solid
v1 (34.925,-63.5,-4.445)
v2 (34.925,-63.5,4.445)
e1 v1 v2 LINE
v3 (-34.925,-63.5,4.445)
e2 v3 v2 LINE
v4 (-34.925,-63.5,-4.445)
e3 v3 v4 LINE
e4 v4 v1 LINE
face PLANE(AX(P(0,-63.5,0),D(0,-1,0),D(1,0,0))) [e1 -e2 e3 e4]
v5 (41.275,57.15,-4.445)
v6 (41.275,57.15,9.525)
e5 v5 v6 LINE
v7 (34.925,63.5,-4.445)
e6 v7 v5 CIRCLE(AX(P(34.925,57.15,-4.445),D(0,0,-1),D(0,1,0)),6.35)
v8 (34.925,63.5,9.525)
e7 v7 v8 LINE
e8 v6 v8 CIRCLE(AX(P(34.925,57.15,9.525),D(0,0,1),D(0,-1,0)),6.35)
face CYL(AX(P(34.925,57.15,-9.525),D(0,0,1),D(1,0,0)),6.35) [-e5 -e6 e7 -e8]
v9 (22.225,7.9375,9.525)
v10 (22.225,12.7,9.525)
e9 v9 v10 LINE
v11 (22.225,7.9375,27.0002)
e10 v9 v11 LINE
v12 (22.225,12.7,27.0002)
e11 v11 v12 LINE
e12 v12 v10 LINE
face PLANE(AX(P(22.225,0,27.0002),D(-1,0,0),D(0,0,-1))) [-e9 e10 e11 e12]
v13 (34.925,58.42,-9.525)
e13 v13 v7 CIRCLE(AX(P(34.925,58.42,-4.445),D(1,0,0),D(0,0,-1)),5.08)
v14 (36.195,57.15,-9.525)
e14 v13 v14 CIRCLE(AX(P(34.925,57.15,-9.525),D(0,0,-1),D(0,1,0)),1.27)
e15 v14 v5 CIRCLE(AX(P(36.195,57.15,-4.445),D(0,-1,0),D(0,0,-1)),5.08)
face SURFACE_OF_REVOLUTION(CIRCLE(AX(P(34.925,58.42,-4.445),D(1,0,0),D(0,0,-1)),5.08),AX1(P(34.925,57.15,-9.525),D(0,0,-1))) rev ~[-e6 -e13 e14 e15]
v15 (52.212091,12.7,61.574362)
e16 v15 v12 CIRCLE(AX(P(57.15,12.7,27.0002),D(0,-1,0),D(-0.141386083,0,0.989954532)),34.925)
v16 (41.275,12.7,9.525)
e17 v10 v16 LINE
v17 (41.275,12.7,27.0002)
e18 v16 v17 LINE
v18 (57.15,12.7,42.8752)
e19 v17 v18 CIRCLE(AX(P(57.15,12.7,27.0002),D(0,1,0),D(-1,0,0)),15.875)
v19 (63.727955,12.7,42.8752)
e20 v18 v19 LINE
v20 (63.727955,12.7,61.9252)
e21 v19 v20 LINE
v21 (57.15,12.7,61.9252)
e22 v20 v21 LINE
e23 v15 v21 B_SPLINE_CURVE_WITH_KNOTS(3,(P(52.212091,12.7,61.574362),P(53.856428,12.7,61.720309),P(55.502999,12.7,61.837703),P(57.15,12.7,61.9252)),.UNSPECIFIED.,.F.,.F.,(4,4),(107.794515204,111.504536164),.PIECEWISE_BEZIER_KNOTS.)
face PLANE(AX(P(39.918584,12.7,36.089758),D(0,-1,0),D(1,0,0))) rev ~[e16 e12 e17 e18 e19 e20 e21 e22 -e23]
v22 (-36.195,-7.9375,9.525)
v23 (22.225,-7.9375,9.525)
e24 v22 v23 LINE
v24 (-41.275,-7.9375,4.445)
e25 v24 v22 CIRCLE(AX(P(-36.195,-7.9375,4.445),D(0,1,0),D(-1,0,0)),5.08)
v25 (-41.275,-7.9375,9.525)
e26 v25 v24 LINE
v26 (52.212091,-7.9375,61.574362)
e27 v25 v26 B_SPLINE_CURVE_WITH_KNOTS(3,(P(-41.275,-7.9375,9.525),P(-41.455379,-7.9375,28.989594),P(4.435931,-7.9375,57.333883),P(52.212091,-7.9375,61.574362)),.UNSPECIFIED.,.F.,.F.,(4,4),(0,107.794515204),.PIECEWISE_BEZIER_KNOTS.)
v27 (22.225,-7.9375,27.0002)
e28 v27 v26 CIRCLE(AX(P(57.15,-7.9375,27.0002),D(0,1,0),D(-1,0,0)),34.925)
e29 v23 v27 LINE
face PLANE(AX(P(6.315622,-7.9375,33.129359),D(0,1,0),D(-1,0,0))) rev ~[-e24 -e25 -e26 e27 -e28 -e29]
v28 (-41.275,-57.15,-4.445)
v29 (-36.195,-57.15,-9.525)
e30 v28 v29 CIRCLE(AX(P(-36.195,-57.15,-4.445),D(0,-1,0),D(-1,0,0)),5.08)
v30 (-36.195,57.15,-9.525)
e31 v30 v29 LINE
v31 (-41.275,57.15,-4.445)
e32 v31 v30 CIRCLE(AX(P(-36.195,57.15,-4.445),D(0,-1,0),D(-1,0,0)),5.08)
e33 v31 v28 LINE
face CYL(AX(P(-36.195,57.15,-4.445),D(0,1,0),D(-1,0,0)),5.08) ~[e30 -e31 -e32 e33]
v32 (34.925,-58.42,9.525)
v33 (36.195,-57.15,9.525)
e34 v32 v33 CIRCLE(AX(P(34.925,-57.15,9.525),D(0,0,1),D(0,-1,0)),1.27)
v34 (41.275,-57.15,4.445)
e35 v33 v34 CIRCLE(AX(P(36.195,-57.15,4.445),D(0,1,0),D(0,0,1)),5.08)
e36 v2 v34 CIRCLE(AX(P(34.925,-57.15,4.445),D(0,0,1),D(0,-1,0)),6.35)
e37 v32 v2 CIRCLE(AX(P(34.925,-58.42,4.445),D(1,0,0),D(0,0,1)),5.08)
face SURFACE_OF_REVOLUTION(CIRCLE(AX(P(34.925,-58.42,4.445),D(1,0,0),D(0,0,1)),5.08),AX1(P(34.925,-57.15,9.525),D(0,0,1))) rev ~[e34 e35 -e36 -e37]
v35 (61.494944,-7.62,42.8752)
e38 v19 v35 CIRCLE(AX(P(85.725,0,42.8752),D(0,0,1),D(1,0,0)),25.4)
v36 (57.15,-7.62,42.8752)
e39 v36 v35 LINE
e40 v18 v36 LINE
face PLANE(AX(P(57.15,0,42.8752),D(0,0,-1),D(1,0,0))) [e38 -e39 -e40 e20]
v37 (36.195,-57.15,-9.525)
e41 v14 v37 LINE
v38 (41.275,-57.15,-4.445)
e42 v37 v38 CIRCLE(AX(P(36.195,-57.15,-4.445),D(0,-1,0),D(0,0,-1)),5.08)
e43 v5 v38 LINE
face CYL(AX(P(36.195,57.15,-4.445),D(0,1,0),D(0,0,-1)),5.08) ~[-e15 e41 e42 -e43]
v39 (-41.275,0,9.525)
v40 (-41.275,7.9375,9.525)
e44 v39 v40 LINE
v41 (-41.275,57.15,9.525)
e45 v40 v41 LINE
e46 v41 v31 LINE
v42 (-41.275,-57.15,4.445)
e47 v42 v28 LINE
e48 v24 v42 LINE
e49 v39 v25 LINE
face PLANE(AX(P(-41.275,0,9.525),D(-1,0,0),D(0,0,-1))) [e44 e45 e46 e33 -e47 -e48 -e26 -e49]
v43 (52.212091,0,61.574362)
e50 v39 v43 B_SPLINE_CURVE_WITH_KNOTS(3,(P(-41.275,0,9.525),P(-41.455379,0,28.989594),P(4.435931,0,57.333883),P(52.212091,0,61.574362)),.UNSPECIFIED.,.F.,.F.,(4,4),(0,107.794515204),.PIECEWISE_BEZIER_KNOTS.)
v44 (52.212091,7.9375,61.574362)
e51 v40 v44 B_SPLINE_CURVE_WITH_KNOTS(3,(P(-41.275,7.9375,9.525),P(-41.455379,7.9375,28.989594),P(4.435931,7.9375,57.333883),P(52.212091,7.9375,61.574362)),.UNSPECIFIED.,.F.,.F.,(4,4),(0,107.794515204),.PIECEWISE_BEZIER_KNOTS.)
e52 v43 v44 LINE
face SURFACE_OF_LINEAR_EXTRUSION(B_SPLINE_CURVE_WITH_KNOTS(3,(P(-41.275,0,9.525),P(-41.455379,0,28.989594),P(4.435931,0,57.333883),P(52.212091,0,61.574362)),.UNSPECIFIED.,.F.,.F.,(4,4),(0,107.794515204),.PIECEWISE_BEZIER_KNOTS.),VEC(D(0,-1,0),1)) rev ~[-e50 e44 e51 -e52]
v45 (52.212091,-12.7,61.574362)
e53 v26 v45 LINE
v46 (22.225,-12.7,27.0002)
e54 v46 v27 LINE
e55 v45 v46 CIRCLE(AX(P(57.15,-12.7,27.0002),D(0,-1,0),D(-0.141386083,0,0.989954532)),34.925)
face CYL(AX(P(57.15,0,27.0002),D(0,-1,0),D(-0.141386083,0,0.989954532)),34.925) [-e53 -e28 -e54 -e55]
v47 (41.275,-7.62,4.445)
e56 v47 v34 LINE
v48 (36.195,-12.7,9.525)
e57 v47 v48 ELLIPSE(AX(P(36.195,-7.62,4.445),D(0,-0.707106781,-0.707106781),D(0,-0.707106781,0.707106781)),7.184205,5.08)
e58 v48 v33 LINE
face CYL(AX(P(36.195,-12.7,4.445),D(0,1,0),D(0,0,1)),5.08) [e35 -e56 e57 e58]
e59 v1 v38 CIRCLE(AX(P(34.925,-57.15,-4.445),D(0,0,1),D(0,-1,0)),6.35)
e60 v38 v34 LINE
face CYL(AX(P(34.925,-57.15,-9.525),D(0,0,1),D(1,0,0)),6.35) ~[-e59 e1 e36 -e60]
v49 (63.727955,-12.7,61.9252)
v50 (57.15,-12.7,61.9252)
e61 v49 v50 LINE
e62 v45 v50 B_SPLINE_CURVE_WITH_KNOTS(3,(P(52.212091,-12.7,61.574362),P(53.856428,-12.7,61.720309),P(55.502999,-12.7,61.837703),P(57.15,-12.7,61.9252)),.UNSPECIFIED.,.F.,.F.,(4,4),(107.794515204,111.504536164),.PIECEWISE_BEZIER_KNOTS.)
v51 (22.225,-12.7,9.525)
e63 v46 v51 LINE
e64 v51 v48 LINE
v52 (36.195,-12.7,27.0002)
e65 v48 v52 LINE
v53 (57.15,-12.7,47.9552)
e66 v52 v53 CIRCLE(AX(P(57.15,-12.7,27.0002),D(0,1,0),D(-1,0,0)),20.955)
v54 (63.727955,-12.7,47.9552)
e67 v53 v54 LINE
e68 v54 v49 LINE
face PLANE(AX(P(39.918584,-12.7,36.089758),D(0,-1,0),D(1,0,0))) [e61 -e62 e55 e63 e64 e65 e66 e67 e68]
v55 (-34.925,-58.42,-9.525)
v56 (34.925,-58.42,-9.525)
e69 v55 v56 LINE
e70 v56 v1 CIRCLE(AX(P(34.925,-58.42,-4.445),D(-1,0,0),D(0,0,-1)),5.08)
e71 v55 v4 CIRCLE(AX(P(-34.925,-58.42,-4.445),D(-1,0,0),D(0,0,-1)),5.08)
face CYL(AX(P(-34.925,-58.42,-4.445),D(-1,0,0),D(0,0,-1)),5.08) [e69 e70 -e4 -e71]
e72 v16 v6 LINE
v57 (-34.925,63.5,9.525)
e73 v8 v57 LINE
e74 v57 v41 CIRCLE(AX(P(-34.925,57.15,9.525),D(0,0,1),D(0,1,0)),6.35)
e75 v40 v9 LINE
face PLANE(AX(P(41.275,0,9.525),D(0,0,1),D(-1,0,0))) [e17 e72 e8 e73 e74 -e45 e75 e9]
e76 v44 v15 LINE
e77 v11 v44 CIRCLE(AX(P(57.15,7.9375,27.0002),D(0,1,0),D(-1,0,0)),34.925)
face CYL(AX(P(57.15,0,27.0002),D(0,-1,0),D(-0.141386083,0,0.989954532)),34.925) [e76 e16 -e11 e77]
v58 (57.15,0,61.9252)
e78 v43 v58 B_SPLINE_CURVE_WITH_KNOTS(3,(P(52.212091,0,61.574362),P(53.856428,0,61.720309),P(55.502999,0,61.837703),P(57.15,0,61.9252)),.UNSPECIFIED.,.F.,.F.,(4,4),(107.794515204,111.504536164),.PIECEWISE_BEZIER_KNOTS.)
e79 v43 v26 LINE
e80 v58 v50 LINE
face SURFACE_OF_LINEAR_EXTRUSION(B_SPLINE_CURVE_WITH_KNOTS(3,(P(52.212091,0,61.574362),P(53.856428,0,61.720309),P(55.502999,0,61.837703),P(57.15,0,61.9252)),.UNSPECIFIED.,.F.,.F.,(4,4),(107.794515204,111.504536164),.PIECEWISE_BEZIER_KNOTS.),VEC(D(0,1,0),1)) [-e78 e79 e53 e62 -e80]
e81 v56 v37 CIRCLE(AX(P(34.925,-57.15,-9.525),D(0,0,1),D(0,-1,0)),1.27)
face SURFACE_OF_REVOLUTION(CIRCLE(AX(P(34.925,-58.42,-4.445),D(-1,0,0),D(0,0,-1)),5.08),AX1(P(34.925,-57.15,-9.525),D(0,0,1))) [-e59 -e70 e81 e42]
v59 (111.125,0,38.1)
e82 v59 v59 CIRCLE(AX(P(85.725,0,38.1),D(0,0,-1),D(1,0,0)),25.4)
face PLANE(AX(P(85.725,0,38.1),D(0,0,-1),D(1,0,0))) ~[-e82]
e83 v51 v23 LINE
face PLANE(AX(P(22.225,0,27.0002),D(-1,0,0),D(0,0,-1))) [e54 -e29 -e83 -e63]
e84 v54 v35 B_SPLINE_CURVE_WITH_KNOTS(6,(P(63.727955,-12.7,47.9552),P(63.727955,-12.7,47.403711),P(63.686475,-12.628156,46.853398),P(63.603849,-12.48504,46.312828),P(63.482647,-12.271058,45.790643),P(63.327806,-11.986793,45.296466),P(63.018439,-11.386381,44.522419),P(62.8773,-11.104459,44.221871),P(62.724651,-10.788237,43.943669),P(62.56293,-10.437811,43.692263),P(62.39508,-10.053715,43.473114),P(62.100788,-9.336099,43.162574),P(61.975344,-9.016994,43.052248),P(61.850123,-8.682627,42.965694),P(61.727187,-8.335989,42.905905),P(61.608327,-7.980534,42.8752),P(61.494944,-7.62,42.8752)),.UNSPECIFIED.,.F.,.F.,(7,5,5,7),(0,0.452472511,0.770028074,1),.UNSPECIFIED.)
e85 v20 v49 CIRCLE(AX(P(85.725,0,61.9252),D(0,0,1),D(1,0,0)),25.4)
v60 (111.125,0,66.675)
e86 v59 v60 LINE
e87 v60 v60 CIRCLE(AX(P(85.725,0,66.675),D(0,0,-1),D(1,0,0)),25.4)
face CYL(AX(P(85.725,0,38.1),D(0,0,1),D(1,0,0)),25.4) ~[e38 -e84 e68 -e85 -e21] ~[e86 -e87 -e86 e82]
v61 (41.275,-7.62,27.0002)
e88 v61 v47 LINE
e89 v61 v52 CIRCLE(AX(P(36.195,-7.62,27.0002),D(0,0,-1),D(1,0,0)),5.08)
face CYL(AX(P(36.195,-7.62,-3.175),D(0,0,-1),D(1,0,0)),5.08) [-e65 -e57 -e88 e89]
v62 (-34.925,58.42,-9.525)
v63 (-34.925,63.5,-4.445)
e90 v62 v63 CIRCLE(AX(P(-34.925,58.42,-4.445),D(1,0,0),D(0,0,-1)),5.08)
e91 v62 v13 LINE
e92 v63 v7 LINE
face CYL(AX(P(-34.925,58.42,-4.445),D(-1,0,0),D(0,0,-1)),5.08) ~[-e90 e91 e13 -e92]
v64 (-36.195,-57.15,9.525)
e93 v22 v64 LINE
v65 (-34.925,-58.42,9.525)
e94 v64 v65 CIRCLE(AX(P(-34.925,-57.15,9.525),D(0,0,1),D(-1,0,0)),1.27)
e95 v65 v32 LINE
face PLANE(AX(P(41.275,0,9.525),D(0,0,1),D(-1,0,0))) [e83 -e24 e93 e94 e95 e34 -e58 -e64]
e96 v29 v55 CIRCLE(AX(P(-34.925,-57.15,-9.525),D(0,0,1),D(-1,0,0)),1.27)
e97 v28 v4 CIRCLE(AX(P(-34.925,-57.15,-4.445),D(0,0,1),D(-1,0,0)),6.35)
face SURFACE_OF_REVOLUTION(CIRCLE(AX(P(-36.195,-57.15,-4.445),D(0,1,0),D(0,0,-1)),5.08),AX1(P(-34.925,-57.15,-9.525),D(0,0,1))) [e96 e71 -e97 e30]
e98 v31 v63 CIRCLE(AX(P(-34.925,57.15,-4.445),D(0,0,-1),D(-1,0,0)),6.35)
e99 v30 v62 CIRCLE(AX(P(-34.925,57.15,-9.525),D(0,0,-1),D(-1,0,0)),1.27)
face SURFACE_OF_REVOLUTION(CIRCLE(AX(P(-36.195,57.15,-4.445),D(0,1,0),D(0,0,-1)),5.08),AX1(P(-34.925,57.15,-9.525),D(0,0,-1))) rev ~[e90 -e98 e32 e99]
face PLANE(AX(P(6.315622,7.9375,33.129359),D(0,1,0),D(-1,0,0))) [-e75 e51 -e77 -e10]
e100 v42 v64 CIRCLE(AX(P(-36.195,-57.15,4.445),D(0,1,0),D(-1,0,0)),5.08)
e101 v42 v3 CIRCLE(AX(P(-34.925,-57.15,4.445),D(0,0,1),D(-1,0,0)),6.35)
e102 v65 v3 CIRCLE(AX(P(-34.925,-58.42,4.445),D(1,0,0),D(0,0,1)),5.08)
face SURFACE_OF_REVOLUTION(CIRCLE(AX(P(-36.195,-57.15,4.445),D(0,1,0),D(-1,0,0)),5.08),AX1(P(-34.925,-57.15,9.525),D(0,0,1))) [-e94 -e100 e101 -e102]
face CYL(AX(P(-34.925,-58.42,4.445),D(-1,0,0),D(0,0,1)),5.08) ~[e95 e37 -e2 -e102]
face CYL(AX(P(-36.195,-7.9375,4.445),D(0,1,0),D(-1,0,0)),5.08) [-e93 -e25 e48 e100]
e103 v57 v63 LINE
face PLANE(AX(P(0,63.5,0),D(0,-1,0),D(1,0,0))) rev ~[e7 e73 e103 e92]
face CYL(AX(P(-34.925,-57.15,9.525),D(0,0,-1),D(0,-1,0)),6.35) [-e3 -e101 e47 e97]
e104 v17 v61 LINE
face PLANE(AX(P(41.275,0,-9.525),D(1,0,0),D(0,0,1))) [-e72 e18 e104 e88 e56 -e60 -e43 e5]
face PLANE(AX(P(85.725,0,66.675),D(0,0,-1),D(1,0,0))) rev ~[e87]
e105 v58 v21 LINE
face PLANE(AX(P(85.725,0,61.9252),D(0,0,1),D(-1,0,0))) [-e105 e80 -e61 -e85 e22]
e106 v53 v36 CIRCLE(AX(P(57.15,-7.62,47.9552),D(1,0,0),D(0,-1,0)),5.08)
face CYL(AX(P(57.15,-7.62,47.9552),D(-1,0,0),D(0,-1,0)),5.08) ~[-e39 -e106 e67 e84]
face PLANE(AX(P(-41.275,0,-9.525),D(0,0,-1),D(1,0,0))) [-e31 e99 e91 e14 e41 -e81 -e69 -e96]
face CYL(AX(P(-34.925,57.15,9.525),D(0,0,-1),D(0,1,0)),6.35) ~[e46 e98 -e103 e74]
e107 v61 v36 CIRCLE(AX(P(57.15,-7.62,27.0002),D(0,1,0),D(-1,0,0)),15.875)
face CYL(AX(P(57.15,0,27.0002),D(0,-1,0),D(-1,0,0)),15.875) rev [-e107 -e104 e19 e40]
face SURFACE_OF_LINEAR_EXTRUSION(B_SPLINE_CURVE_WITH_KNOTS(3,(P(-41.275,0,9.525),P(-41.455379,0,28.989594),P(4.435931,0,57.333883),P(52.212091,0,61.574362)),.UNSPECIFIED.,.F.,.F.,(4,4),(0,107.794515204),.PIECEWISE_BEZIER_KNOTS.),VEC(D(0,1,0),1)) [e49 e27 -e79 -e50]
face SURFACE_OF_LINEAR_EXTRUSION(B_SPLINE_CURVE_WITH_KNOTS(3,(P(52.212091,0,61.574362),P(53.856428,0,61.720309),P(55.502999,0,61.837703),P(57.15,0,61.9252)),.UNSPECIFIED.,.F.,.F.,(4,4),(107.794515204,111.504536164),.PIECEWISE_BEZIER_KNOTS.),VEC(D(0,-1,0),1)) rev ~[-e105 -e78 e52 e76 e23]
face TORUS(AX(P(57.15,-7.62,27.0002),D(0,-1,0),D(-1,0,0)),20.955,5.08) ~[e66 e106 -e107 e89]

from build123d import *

# Parameters (mm, degrees)
F1_DEPTH     = 63.5
F0_W         = 25.4
F0_H         = 19.05
F2_DEPTH     = 12.7
F3_DEPTH     = 7.9375
F5_R         = 6.35
F6_T1_DEPTH  = 114.3
F6_T3_DEPTH  = 17.4752
F6_T5_DEPTH  = 49.2125
F6_T7_DEPTH  = 69.85
F6_T9_DEPTH  = 44.45
F6_T12_ANGLE = 90
F6_T14_ANGLE = 90
F6_T16_ANGLE = 90
F6_T18_ANGLE = 90
F6_T20_ANGLE = 90
F6_T22_ANGLE = 90
F6_T26_DEPTH = 19.2779547439
F6_S27_R     = 25.4
F6_T28_DEPTH = 12
F6_T30_ANGLE = 90
F6_T35_DEPTH = 57.15
F6_T39_DEPTH = 30.1752


# Not quite as in the source:
# - a fillet or chamfer that OpenCascade refuses, or shapes differently, is made with other operations: its cross-section is extruded or revolved along the edge and cut away or added


with BuildPart() as f1:
    # F0 (on Front) → F1 (new body, symmetric)
    with BuildSketch(Plane.XZ):
        Polygon((-41.275, 9.525), (-41.275, -9.525), (41.275, -9.525), (41.275, 9.525), (22.225, 9.525), align=None)
    extrude(amount=F1_DEPTH, both=True)

    # F0 (on Front) → F2 (join, symmetric)
    with BuildSketch(Plane.XZ):
        with BuildLine():
            Line((22.225, 9.525), (41.275, 9.525))
            Line((41.275, 9.525), (41.275, 27.0002))
            ThreePointArc((41.275, 27.0002), (45.9246798487, 38.2255201513), (57.15, 42.8752))
            Line((57.15, 42.8752), (60.325, 42.8752))
            Line((60.325, 42.8752), (60.325, 61.9252))
            Line((60.325, 61.9252), (57.15, 61.9252))
            add(Edge.make_bspline(
                [(52.2120910402, 61.5743620304), (53.8564284602, 61.7203088284), (55.5029986104, 61.8377030625), (57.15, 61.9252)],
                knots=[107.7945152041, 107.7945152041, 107.7945152041, 107.7945152041, 111.5045361635, 111.5045361635, 111.5045361635, 111.5045361635], degree=3))
            ThreePointArc((52.2120910402, 61.5743620304), (30.766178296, 49.8835908608), (22.225, 27.0002))
            Line((22.225, 27.0002), (22.225, 9.525))
        make_face()
        with Locations((73.025, 52.4002)):
            Rectangle(F0_W, F0_H)
    extrude(amount=F2_DEPTH, both=True)

    # F0 (on Front) → F3 (join, symmetric)
    with BuildSketch(Plane.XZ):
        with BuildLine():
            add(Edge.make_bspline(
                [(-41.275, 9.525), (-41.4553787608, 28.9895938663), (4.4359310246, 57.3338834698), (52.2120910402, 61.5743620304)],
                knots=[0, 0, 0, 0, 107.7945152041, 107.7945152041, 107.7945152041, 107.7945152041], degree=3))
            Line((-41.275, 9.525), (22.225, 9.525))
            Line((22.225, 9.525), (22.225, 27.0002))
            ThreePointArc((22.225, 27.0002), (30.766178296, 49.8835908608), (52.2120910402, 61.5743620304))
        make_face()
    extrude(amount=F3_DEPTH, both=True)

    # F0 (on Front) → F4 (revolve)
    with BuildSketch(Plane.XZ):
        Polygon((85.725, 66.675), (85.725, 61.9252), (85.725, 42.8752), (85.725, 38.1), (111.125, 38.1), (111.125, 66.675), align=None)
    revolve(axis=Axis((85.725, 0, 52.3875), (0, 0, -1)))

    # F5
    f5_edges = [f1.edges().sort_by_distance(p)[0] for p in [
        (41.275, -63.5, 0),
        (-41.275, -63.5, 0),
        (41.275, 63.5, 0),
        (-41.275, 63.5, 0),
    ]]
    fillet(f5_edges, radius=F5_R)

    # F6: fillet of radius 5.08 on 16 edges, made by hand

    # F6_s2 → F6_t1 (cut)
    with BuildSketch(Plane.XZ.offset(-57.15)):
        with BuildLine():
            ThreePointArc((36.195, -9.525), (39.7871024484, -8.0371024484), (41.275, -4.445))
            Line((41.275, -4.445), (41.275, -9.525))
            Line((41.275, -9.525), (36.195, -9.525))
        make_face()
        with BuildLine():
            ThreePointArc((-41.275, -4.445), (-39.7871024484, -8.0371024484), (-36.195, -9.525))
            Line((-36.195, -9.525), (-41.275, -9.525))
            Line((-41.275, -9.525), (-41.275, -4.445))
        make_face()
    extrude(amount=F6_T1_DEPTH, mode=Mode.SUBTRACT)

    # F6_s4 → F6_t3 (cut)
    with BuildSketch(Plane.XY.offset(9.525)):
        with BuildLine():
            ThreePointArc((41.275, -7.62), (39.7871024484, -11.2121024484), (36.195, -12.7))
            Line((36.195, -12.7), (41.275, -12.7))
            Line((41.275, -12.7), (41.275, -7.62))
        make_face()
    extrude(amount=F6_T3_DEPTH, mode=Mode.SUBTRACT)

    # F6_s6 → F6_t5 (cut)
    with BuildSketch(Plane.XZ.offset(7.9375)):
        with BuildLine():
            ThreePointArc((-41.275, 4.445), (-39.7871024484, 8.0371024484), (-36.195, 9.525))
            Line((-36.195, 9.525), (-41.275, 9.525))
            Line((-41.275, 9.525), (-41.275, 4.445))
        make_face()
    extrude(amount=F6_T5_DEPTH, mode=Mode.SUBTRACT)

    # F6_s8 → F6_t7 (cut)
    with BuildSketch(Plane.YZ.offset(-34.925)):
        with BuildLine():
            ThreePointArc((58.42, -9.525), (62.0121024484, -8.0371024484), (63.5, -4.445))
            Line((63.5, -4.445), (63.5, -9.525))
            Line((63.5, -9.525), (58.42, -9.525))
        make_face()
        with BuildLine():
            ThreePointArc((-58.42, -9.525), (-62.0121024484, -8.0371024484), (-63.5, -4.445))
            Line((-63.5, -4.445), (-63.5, -9.525))
            Line((-63.5, -9.525), (-58.42, -9.525))
        make_face()
        with BuildLine():
            ThreePointArc((-58.42, 9.525), (-62.0121024484, 8.0371024484), (-63.5, 4.445))
            Line((-63.5, 4.445), (-63.5, 9.525))
            Line((-63.5, 9.525), (-58.42, 9.525))
        make_face()
    extrude(amount=F6_T7_DEPTH, mode=Mode.SUBTRACT)

    # F6_s10 → F6_t9 (cut)
    with BuildSketch(Plane.XZ.offset(12.7)):
        with BuildLine():
            ThreePointArc((36.195, 9.525), (39.7871024484, 8.0371024484), (41.275, 4.445))
            Line((41.275, 4.445), (41.275, 9.525))
            Line((41.275, 9.525), (36.195, 9.525))
        make_face()
    extrude(amount=F6_T9_DEPTH, mode=Mode.SUBTRACT)

    # F6_s11 → F6_t12 (revolve, cut)
    with BuildSketch(Plane.YZ.offset(34.925)):
        with BuildLine():
            ThreePointArc((-58.42, 9.525), (-62.0121024484, 8.0371024484), (-63.5, 4.445))
            Line((-63.5, 4.445), (-63.5, 9.525))
            Line((-63.5, 9.525), (-58.42, 9.525))
        make_face()
    revolve(axis=Axis((34.925, -57.15, 9.525), (0, 0, 1)), revolution_arc=F6_T12_ANGLE, mode=Mode.SUBTRACT)

    # F6_s13 → F6_t14 (revolve, cut)
    with BuildSketch(Plane.XZ.offset(-57.15)):
        with BuildLine():
            ThreePointArc((-36.195, -9.525), (-39.7871024484, -8.0371024484), (-41.275, -4.445))
            Line((-41.275, -4.445), (-41.275, -9.525))
            Line((-41.275, -9.525), (-36.195, -9.525))
        make_face()
    revolve(axis=Axis((-34.925, 57.15, -9.525), (0, 0, -1)), revolution_arc=F6_T14_ANGLE, mode=Mode.SUBTRACT)

    # F6_s15 → F6_t16 (revolve, cut)
    with BuildSketch(Plane.XZ.offset(57.15)):
        with BuildLine():
            ThreePointArc((-36.195, -9.525), (-39.7871024484, -8.0371024484), (-41.275, -4.445))
            Line((-41.275, -4.445), (-41.275, -9.525))
            Line((-41.275, -9.525), (-36.195, -9.525))
        make_face()
    revolve(axis=Axis((-34.925, -57.15, -9.525), (0, 0, 1)), revolution_arc=F6_T16_ANGLE, mode=Mode.SUBTRACT)

    # F6_s17 → F6_t18 (revolve, cut)
    with BuildSketch(Plane.YZ.offset(34.925)):
        with BuildLine():
            ThreePointArc((58.42, -9.525), (62.0121024484, -8.0371024484), (63.5, -4.445))
            Line((63.5, -4.445), (63.5, -9.525))
            Line((63.5, -9.525), (58.42, -9.525))
        make_face()
    revolve(axis=Axis((34.925, 57.15, -9.525), (0, 0, -1)), revolution_arc=F6_T18_ANGLE, mode=Mode.SUBTRACT)

    # F6_s19 → F6_t20 (revolve, cut)
    with BuildSketch(Plane.YZ.offset(34.925)):
        with BuildLine():
            ThreePointArc((-58.42, -9.525), (-62.0121024484, -8.0371024484), (-63.5, -4.445))
            Line((-63.5, -4.445), (-63.5, -9.525))
            Line((-63.5, -9.525), (-58.42, -9.525))
        make_face()
    revolve(axis=Axis((34.925, -57.15, -9.525), (0, 0, 1)), revolution_arc=F6_T20_ANGLE, mode=Mode.SUBTRACT)

    # F6_s21 → F6_t22 (revolve, cut)
    with BuildSketch(Plane.XZ.offset(57.15)):
        with BuildLine():
            ThreePointArc((-41.275, 4.445), (-39.7871024484, 8.0371024484), (-36.195, 9.525))
            Line((-36.195, 9.525), (-41.275, 9.525))
            Line((-41.275, 9.525), (-41.275, 4.445))
        make_face()
    revolve(axis=Axis((-34.925, -57.15, 9.525), (0, 0, 1)), revolution_arc=F6_T22_ANGLE, mode=Mode.SUBTRACT)


with BuildPart() as f6_tool24:
    # F6_s25 → F6_t26 (new body)
    with BuildSketch(Plane.YZ.offset(57.15)):
        with BuildLine():
            ThreePointArc((-12.7, 47.9552), (-11.2121024484, 44.3630975516), (-7.62, 42.8752))
            Line((-7.62, 42.8752), (-12.7, 42.8752))
            Line((-12.7, 42.8752), (-12.7, 47.9552))
        make_face()
    extrude(amount=F6_T26_DEPTH)

    # F6_s27 → F6_t28 (cut, symmetric)
    with BuildSketch(Plane.XY.offset(45.4)):
        with Locations((85.725, 0)):
            Circle(F6_S27_R)
    extrude(amount=F6_T28_DEPTH, both=True, mode=Mode.SUBTRACT)


with BuildPart() as f1_1:
    add(f1.part)

    # F6_t23: cut F6_tool24
    add(f6_tool24.part, mode=Mode.SUBTRACT)

    # F6_s29 → F6_t30 (revolve, cut)
    with BuildSketch(Plane.XY.offset(27.0002)):
        with BuildLine():
            ThreePointArc((36.195, -12.7), (39.7871024484, -11.2121024484), (41.275, -7.62))
            Line((41.275, -7.62), (41.275, -12.7))
            Line((41.275, -12.7), (36.195, -12.7))
        make_face()
    revolve(axis=Axis((57.15, -12.7, 27.0002), (0, 1, 0)), revolution_arc=F6_T30_ANGLE, mode=Mode.SUBTRACT)


with BuildPart() as f6_tool33:
    # F6_s34 → F6_t35 (new body)
    with BuildSketch(Plane.XZ.offset(57.15)):
        with BuildLine():
            ThreePointArc((36.195, 9.525), (39.7871024484, 8.0371024484), (41.275, 4.445))
            Line((41.275, 4.445), (41.275, 9.525))
            Line((41.275, 9.525), (36.195, 9.525))
        make_face()
    extrude(amount=-F6_T35_DEPTH)

    split(bisect_by=Plane.XZ.offset(12.7), keep=Keep.BOTTOM)


with BuildPart() as f6_tool37:
    # F6_s38 → F6_t39 (new body)
    with BuildSketch(Plane.XY.offset(-3.175)):
        with BuildLine():
            ThreePointArc((41.275, -7.62), (39.7871024484, -11.2121024484), (36.195, -12.7))
            Line((36.195, -12.7), (41.275, -12.7))
            Line((41.275, -12.7), (41.275, -7.62))
        make_face()
    extrude(amount=F6_T39_DEPTH)

    split(bisect_by=Plane.XY.offset(9.525), keep=Keep.BOTTOM)


with BuildPart() as f6_tool33_1:
    add(f6_tool33.part)

    # F6_t41: intersect F6_tool37
    add(f6_tool37.part, mode=Mode.INTERSECT)


with BuildPart() as f1_2:
    add(f1_1.part)

    # F6_t31: cut F6_tool33
    add(f6_tool33_1.part, mode=Mode.SUBTRACT)


solid = f1_2.part
